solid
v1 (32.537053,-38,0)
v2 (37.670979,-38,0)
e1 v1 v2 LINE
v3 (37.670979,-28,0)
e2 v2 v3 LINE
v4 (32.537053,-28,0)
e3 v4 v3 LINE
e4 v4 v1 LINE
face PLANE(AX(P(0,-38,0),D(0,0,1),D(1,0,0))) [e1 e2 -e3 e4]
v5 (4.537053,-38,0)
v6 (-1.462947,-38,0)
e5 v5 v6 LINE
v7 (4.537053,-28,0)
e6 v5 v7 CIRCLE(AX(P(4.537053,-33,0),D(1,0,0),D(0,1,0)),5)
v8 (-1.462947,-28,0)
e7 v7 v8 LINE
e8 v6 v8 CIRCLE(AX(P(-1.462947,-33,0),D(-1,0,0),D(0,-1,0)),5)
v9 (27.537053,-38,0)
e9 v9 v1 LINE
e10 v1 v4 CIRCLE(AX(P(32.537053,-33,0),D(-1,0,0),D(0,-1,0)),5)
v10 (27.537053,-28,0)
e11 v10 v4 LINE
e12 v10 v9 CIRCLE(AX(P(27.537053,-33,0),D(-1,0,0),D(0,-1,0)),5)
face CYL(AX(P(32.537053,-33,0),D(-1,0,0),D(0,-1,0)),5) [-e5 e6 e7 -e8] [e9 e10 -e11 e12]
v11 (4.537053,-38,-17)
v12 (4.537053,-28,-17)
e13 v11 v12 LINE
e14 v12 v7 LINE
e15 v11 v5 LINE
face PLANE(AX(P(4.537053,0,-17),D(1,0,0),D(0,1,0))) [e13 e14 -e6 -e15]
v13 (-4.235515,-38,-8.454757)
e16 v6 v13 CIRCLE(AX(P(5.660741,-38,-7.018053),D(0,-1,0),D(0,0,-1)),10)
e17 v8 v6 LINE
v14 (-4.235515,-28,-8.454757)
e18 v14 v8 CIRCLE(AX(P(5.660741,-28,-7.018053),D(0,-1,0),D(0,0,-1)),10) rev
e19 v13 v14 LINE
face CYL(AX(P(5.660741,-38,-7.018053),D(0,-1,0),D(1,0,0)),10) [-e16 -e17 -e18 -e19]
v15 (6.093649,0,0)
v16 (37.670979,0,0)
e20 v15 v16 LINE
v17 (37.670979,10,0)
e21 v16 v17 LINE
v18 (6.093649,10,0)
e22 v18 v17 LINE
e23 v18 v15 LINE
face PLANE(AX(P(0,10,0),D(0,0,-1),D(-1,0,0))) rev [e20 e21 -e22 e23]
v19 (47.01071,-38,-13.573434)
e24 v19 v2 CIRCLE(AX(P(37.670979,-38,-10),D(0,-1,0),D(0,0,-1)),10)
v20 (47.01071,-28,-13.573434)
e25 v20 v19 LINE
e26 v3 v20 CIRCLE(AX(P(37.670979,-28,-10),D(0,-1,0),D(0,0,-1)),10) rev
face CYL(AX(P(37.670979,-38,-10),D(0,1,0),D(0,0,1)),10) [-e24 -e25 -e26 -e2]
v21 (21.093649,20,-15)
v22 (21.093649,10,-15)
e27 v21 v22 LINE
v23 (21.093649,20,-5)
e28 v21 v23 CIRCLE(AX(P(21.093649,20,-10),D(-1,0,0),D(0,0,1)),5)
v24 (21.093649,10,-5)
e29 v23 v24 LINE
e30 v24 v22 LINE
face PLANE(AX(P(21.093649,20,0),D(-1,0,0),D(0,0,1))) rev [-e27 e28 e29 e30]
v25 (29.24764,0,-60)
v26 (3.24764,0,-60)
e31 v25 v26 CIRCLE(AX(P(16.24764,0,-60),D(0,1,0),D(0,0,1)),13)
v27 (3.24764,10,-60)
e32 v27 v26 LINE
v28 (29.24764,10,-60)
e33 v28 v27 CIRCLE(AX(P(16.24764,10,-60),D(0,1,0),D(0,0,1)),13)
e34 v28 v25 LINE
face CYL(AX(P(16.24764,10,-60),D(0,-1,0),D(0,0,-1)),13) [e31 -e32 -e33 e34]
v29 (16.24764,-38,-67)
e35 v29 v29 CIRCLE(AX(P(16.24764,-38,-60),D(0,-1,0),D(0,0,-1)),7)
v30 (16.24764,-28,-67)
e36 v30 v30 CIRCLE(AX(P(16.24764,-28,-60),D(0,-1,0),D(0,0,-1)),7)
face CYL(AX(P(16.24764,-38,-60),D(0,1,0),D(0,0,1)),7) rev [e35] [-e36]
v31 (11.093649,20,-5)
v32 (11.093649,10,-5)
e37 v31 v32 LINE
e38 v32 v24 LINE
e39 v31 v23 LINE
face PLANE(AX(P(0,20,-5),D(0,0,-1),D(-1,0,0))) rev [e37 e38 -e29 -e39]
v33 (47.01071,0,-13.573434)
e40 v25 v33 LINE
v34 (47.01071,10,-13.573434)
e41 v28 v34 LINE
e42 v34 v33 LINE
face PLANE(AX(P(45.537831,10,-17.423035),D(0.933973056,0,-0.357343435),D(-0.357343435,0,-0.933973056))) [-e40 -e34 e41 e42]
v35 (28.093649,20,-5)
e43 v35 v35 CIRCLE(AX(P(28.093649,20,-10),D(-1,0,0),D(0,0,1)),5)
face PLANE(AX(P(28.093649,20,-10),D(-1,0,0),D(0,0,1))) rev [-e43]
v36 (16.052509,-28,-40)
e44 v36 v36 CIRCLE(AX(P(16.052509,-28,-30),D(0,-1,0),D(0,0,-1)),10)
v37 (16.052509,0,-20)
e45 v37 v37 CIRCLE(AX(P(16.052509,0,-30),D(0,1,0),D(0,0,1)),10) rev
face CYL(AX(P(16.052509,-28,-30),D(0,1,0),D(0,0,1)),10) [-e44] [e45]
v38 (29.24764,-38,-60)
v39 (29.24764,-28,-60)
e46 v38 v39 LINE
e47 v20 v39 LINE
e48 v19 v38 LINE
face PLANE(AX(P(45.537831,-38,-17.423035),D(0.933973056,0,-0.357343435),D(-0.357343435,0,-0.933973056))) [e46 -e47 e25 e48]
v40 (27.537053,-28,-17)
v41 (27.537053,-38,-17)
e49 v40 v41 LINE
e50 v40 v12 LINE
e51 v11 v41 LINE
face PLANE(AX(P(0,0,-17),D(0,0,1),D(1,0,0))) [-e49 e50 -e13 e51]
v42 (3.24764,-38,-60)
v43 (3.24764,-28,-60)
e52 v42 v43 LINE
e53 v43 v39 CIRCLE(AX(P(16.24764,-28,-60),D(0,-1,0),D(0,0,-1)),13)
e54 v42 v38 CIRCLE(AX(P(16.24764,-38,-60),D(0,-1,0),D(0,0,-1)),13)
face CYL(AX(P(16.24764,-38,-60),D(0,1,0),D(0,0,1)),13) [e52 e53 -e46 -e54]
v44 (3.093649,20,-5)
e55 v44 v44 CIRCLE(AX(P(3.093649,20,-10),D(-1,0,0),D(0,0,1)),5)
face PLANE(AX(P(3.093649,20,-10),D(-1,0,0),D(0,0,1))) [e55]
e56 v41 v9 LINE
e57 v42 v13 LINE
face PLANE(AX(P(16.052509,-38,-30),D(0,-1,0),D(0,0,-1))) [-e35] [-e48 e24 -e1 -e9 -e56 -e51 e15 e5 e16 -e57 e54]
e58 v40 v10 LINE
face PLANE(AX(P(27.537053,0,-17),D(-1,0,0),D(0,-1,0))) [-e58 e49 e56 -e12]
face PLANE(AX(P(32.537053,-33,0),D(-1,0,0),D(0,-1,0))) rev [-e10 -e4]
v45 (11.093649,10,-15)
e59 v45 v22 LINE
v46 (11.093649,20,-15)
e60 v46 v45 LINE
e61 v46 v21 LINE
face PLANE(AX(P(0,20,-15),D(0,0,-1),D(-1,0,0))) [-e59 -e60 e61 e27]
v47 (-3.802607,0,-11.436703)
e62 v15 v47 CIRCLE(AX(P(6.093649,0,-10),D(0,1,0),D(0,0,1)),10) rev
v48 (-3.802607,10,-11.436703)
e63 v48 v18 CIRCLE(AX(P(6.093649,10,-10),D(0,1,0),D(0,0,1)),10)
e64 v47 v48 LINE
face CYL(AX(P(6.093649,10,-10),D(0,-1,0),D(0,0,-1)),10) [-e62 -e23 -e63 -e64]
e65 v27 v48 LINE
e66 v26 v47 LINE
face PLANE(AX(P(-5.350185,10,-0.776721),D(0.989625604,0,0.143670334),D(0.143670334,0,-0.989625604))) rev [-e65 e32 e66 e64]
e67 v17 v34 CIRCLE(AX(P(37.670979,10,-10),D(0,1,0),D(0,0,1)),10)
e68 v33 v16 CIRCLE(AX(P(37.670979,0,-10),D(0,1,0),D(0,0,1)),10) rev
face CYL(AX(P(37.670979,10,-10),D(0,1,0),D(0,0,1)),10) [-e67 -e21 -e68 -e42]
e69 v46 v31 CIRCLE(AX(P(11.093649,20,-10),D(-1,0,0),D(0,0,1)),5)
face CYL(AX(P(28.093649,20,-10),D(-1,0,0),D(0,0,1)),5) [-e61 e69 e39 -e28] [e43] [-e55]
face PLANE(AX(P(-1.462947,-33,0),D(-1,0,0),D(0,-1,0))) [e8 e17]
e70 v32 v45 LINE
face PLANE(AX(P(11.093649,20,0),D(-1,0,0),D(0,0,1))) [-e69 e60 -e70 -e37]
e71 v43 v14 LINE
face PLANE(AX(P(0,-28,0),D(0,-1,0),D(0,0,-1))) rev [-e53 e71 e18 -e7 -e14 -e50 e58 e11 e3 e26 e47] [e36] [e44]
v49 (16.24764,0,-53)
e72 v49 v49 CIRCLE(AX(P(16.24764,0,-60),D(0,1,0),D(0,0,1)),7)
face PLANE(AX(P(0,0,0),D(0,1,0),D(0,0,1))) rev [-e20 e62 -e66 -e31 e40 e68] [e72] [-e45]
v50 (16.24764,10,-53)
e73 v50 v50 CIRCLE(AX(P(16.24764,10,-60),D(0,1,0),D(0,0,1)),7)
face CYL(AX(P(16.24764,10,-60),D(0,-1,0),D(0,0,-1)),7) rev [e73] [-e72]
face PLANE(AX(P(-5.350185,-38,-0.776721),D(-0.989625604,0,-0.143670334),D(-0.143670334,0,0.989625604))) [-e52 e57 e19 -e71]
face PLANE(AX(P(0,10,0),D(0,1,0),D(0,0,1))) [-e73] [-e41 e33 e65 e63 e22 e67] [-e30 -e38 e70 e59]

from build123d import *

# Parameters (mm, degrees)
SKETCH1_R                = 13
SKETCH1_R_2              = 7
BOSS_EXTRUDE2_DEPTH      = 10
SKETCH2_R                = 10
BOSS_EXTRUDE3_DEPTH      = 28
SKETCH3_R                = 10
SKETCH3_R_2              = 13
SKETCH3_R_3              = 7
BOSS_EXTRUDE4_DEPTH      = 10
FILLET2_R                = 10
CUT_EXTRUDE1_DEPTH       = 17
BOSS_EXTRUDE5_DEPTH      = 29
BOSS_EXTRUDE5_DEPTH_BACK = 5
SKETCH5_R                = 5
FILLET3_R                = 10
SKETCH6_R                = 10
BOSS_EXTRUDE6_DEPTH      = 10
SKETCH7_W                = 10
SKETCH7_H                = 10
BOSS_EXTRUDE7_DEPTH      = 10
BOSS_EXTRUDE8_DEPTH      = 8
BOSS_EXTRUDE8_DEPTH_BACK = 17
SKETCH8_R                = 5


with BuildPart() as part:
    # Sketch1 → Boss-Extrude2 (new body)
    # profile 1 of 2: a face of its own
    with BuildSketch(Plane(origin=(0, 0, 0), x_dir=(1, 0, 0), z_dir=(0, 1, 0))):
        with BuildLine():
            ThreePointArc((29.247640438, 60), (16.247640438, 47), (3.247640438, 60))
            Line((3.247640438, 60), (-5.462946679, 0))
            Line((-5.462946679, 0), (52.203983694, 0))
            Line((52.203983694, 0), (29.247640438, 60))
        make_face()
    # profile 2 of 2: a face of its own
    with BuildSketch(Plane(origin=(0, 0, 0), x_dir=(1, 0, 0), z_dir=(0, 1, 0))):
        with Locations((16.247640438, 60)):
            Circle(SKETCH1_R)
        with Locations(Location((16.247640438, 60, 0), (0, 0, 270))):
            Circle(SKETCH1_R_2, mode=Mode.SUBTRACT)
    extrude(amount=BOSS_EXTRUDE2_DEPTH)

    # Sketch2 → Boss-Extrude3 (add)
    with BuildSketch(Plane.XZ):
        with Locations(Location((16.05250876, -30, 0), (0, 0, 90))):
            Circle(SKETCH2_R)
    extrude(amount=BOSS_EXTRUDE3_DEPTH)

    # Fillet2
    fillet2_edges = [part.edges().sort_by_distance(p)[0] for p in [
        (52.203983694, 5, 0),
        (-5.462946679, 5, 0),
    ]]
    fillet(fillet2_edges, radius=FILLET2_R)



with BuildPart() as body_2:
    # Sketch3 → Boss-Extrude4 (new body)
    # profile 1 of 2: a face of its own
    with BuildSketch(Plane.XZ.offset(28)):
        with BuildLine():
            Line((-5.462946679, 0), (3.247640438, -60))
            ThreePointArc((3.247640438, -60), (16.247640438, -47), (29.247640438, -60))
            Line((29.247640438, -60), (52.203983694, 0))
            Line((52.203983694, 0), (-5.462946679, 0))
        make_face()
        with Locations(Location((16.05250876, -30, 0), (0, 0, 90))):
            Circle(SKETCH3_R, mode=Mode.SUBTRACT)
    # profile 2 of 2: a face of its own
    with BuildSketch(Plane.XZ.offset(28)):
        with Locations((16.247640438, -60)):
            Circle(SKETCH3_R_2)
        with Locations(Location((16.247640438, -60, 0), (0, 0, 90))):
            Circle(SKETCH3_R_3, mode=Mode.SUBTRACT)
    extrude(amount=BOSS_EXTRUDE4_DEPTH)

    # Sketch4 → Cut-Extrude1 (cut)
    with BuildSketch(Plane.XY):
        Polygon((4.537053321, -33), (4.537053321, -38), (27.537053321, -38), (27.537053321, -28), (4.537053321, -28), align=None)
    extrude(amount=-CUT_EXTRUDE1_DEPTH, mode=Mode.SUBTRACT)

    # Sketch5 → Boss-Extrude5 (add, two sides: drawn at the far end of the back side and taken through both)
    with BuildSketch(Plane.ZY.offset(-27.537053321).offset(-BOSS_EXTRUDE5_DEPTH_BACK)):
        with Locations(Location((0, -33, 0), (0, 0, 270))):
            Circle(SKETCH5_R)
    extrude(amount=BOSS_EXTRUDE5_DEPTH + BOSS_EXTRUDE5_DEPTH_BACK)

    # Fillet3
    # the kernel refuses this fillet: 10 mm, written as the material it takes off along each edge
    with BuildSketch(Plane(origin=(-5.462946679, -6.641526704, 0), x_dir=(0.14367033386913813, 0, -0.989625603531927), z_dir=(0, -1, 0))) as fillet3_piece_1:
        with BuildLine():
            CenterArc((8.543389319, 10), FILLET3_R, 217.167683939, 52.832316061)
            Line((0.574681335, 3.958502414), (0.415307176, 3.837672462))
            ThreePointArc((0.415307176, 3.837672462), (0.089415547, 2.007985274), (-0.197925121, 0.028734067))
            Line((-0.197925121, 0.028734067), (0, -0.2))
            Line((0, -0.2), (8.543389319, -0.2))
            Line((8.543389319, -0.2), (8.543389319, 0))
        make_face()
    extrude(amount=52.716946593, mode=Mode.SUBTRACT)
    with BuildSketch(Plane(origin=(52.203983694, 8.33251049, 0), x_dir=(-0.35734343452809125, 0, -0.9339730562493052), z_dir=(0, -1, 0))) as fillet3_piece_2:
        with BuildLine():
            CenterArc((FILLET3_R * 1.45330041958, -FILLET3_R), FILLET3_R, 90, 110.9371366)
            Line((FILLET3_R * 0.519327363336, -FILLET3_R * 1.35734343453), (FILLET3_R * 0.500647902211, -FILLET3_R * 1.36449030322))
            Line((FILLET3_R * 0.500647902211, -FILLET3_R * 1.36449030322), (-FILLET3_R * 0.0290660083917, FILLET3_R * 0.02))
            Line((-FILLET3_R * 0.0290660083917, FILLET3_R * 0.02), (FILLET3_R * 1.45330041958, FILLET3_R * 0.02))
            Line((FILLET3_R * 1.45330041958, FILLET3_R * 0.02), (FILLET3_R * 1.45330041958, 0))
        make_face()
    extrude(amount=82.665020979, mode=Mode.SUBTRACT)


with BuildPart() as part_1:
    add(part.part)

    add(body_2.part)  # Boss-Extrude6 merges body 2
    # Sketch6 → Boss-Extrude6 (add)
    with BuildSketch(Plane.XZ.offset(28)):
        with Locations(Location((16.05250876, -30, 0), (0, 0, 90))):
            Circle(SKETCH6_R)
    extrude(amount=BOSS_EXTRUDE6_DEPTH)

    # Sketch7 → Boss-Extrude7 (add)
    with BuildSketch(Plane(origin=(0, 10, 0), x_dir=(1, 0, 0), z_dir=(0, 1, 0))):
        with Locations((16.093649369, 10)):
            Rectangle(SKETCH7_W, SKETCH7_H)
    extrude(amount=BOSS_EXTRUDE7_DEPTH)

    # Sketch8 → Boss-Extrude8 (add, two sides: drawn at the far end of the back side and taken through both)
    with BuildSketch(Plane.ZY.offset(-11.093649369).offset(-BOSS_EXTRUDE8_DEPTH_BACK)):
        with Locations((-10, 20)):
            Circle(SKETCH8_R)
    extrude(amount=BOSS_EXTRUDE8_DEPTH + BOSS_EXTRUDE8_DEPTH_BACK)


solid = part_1.part
